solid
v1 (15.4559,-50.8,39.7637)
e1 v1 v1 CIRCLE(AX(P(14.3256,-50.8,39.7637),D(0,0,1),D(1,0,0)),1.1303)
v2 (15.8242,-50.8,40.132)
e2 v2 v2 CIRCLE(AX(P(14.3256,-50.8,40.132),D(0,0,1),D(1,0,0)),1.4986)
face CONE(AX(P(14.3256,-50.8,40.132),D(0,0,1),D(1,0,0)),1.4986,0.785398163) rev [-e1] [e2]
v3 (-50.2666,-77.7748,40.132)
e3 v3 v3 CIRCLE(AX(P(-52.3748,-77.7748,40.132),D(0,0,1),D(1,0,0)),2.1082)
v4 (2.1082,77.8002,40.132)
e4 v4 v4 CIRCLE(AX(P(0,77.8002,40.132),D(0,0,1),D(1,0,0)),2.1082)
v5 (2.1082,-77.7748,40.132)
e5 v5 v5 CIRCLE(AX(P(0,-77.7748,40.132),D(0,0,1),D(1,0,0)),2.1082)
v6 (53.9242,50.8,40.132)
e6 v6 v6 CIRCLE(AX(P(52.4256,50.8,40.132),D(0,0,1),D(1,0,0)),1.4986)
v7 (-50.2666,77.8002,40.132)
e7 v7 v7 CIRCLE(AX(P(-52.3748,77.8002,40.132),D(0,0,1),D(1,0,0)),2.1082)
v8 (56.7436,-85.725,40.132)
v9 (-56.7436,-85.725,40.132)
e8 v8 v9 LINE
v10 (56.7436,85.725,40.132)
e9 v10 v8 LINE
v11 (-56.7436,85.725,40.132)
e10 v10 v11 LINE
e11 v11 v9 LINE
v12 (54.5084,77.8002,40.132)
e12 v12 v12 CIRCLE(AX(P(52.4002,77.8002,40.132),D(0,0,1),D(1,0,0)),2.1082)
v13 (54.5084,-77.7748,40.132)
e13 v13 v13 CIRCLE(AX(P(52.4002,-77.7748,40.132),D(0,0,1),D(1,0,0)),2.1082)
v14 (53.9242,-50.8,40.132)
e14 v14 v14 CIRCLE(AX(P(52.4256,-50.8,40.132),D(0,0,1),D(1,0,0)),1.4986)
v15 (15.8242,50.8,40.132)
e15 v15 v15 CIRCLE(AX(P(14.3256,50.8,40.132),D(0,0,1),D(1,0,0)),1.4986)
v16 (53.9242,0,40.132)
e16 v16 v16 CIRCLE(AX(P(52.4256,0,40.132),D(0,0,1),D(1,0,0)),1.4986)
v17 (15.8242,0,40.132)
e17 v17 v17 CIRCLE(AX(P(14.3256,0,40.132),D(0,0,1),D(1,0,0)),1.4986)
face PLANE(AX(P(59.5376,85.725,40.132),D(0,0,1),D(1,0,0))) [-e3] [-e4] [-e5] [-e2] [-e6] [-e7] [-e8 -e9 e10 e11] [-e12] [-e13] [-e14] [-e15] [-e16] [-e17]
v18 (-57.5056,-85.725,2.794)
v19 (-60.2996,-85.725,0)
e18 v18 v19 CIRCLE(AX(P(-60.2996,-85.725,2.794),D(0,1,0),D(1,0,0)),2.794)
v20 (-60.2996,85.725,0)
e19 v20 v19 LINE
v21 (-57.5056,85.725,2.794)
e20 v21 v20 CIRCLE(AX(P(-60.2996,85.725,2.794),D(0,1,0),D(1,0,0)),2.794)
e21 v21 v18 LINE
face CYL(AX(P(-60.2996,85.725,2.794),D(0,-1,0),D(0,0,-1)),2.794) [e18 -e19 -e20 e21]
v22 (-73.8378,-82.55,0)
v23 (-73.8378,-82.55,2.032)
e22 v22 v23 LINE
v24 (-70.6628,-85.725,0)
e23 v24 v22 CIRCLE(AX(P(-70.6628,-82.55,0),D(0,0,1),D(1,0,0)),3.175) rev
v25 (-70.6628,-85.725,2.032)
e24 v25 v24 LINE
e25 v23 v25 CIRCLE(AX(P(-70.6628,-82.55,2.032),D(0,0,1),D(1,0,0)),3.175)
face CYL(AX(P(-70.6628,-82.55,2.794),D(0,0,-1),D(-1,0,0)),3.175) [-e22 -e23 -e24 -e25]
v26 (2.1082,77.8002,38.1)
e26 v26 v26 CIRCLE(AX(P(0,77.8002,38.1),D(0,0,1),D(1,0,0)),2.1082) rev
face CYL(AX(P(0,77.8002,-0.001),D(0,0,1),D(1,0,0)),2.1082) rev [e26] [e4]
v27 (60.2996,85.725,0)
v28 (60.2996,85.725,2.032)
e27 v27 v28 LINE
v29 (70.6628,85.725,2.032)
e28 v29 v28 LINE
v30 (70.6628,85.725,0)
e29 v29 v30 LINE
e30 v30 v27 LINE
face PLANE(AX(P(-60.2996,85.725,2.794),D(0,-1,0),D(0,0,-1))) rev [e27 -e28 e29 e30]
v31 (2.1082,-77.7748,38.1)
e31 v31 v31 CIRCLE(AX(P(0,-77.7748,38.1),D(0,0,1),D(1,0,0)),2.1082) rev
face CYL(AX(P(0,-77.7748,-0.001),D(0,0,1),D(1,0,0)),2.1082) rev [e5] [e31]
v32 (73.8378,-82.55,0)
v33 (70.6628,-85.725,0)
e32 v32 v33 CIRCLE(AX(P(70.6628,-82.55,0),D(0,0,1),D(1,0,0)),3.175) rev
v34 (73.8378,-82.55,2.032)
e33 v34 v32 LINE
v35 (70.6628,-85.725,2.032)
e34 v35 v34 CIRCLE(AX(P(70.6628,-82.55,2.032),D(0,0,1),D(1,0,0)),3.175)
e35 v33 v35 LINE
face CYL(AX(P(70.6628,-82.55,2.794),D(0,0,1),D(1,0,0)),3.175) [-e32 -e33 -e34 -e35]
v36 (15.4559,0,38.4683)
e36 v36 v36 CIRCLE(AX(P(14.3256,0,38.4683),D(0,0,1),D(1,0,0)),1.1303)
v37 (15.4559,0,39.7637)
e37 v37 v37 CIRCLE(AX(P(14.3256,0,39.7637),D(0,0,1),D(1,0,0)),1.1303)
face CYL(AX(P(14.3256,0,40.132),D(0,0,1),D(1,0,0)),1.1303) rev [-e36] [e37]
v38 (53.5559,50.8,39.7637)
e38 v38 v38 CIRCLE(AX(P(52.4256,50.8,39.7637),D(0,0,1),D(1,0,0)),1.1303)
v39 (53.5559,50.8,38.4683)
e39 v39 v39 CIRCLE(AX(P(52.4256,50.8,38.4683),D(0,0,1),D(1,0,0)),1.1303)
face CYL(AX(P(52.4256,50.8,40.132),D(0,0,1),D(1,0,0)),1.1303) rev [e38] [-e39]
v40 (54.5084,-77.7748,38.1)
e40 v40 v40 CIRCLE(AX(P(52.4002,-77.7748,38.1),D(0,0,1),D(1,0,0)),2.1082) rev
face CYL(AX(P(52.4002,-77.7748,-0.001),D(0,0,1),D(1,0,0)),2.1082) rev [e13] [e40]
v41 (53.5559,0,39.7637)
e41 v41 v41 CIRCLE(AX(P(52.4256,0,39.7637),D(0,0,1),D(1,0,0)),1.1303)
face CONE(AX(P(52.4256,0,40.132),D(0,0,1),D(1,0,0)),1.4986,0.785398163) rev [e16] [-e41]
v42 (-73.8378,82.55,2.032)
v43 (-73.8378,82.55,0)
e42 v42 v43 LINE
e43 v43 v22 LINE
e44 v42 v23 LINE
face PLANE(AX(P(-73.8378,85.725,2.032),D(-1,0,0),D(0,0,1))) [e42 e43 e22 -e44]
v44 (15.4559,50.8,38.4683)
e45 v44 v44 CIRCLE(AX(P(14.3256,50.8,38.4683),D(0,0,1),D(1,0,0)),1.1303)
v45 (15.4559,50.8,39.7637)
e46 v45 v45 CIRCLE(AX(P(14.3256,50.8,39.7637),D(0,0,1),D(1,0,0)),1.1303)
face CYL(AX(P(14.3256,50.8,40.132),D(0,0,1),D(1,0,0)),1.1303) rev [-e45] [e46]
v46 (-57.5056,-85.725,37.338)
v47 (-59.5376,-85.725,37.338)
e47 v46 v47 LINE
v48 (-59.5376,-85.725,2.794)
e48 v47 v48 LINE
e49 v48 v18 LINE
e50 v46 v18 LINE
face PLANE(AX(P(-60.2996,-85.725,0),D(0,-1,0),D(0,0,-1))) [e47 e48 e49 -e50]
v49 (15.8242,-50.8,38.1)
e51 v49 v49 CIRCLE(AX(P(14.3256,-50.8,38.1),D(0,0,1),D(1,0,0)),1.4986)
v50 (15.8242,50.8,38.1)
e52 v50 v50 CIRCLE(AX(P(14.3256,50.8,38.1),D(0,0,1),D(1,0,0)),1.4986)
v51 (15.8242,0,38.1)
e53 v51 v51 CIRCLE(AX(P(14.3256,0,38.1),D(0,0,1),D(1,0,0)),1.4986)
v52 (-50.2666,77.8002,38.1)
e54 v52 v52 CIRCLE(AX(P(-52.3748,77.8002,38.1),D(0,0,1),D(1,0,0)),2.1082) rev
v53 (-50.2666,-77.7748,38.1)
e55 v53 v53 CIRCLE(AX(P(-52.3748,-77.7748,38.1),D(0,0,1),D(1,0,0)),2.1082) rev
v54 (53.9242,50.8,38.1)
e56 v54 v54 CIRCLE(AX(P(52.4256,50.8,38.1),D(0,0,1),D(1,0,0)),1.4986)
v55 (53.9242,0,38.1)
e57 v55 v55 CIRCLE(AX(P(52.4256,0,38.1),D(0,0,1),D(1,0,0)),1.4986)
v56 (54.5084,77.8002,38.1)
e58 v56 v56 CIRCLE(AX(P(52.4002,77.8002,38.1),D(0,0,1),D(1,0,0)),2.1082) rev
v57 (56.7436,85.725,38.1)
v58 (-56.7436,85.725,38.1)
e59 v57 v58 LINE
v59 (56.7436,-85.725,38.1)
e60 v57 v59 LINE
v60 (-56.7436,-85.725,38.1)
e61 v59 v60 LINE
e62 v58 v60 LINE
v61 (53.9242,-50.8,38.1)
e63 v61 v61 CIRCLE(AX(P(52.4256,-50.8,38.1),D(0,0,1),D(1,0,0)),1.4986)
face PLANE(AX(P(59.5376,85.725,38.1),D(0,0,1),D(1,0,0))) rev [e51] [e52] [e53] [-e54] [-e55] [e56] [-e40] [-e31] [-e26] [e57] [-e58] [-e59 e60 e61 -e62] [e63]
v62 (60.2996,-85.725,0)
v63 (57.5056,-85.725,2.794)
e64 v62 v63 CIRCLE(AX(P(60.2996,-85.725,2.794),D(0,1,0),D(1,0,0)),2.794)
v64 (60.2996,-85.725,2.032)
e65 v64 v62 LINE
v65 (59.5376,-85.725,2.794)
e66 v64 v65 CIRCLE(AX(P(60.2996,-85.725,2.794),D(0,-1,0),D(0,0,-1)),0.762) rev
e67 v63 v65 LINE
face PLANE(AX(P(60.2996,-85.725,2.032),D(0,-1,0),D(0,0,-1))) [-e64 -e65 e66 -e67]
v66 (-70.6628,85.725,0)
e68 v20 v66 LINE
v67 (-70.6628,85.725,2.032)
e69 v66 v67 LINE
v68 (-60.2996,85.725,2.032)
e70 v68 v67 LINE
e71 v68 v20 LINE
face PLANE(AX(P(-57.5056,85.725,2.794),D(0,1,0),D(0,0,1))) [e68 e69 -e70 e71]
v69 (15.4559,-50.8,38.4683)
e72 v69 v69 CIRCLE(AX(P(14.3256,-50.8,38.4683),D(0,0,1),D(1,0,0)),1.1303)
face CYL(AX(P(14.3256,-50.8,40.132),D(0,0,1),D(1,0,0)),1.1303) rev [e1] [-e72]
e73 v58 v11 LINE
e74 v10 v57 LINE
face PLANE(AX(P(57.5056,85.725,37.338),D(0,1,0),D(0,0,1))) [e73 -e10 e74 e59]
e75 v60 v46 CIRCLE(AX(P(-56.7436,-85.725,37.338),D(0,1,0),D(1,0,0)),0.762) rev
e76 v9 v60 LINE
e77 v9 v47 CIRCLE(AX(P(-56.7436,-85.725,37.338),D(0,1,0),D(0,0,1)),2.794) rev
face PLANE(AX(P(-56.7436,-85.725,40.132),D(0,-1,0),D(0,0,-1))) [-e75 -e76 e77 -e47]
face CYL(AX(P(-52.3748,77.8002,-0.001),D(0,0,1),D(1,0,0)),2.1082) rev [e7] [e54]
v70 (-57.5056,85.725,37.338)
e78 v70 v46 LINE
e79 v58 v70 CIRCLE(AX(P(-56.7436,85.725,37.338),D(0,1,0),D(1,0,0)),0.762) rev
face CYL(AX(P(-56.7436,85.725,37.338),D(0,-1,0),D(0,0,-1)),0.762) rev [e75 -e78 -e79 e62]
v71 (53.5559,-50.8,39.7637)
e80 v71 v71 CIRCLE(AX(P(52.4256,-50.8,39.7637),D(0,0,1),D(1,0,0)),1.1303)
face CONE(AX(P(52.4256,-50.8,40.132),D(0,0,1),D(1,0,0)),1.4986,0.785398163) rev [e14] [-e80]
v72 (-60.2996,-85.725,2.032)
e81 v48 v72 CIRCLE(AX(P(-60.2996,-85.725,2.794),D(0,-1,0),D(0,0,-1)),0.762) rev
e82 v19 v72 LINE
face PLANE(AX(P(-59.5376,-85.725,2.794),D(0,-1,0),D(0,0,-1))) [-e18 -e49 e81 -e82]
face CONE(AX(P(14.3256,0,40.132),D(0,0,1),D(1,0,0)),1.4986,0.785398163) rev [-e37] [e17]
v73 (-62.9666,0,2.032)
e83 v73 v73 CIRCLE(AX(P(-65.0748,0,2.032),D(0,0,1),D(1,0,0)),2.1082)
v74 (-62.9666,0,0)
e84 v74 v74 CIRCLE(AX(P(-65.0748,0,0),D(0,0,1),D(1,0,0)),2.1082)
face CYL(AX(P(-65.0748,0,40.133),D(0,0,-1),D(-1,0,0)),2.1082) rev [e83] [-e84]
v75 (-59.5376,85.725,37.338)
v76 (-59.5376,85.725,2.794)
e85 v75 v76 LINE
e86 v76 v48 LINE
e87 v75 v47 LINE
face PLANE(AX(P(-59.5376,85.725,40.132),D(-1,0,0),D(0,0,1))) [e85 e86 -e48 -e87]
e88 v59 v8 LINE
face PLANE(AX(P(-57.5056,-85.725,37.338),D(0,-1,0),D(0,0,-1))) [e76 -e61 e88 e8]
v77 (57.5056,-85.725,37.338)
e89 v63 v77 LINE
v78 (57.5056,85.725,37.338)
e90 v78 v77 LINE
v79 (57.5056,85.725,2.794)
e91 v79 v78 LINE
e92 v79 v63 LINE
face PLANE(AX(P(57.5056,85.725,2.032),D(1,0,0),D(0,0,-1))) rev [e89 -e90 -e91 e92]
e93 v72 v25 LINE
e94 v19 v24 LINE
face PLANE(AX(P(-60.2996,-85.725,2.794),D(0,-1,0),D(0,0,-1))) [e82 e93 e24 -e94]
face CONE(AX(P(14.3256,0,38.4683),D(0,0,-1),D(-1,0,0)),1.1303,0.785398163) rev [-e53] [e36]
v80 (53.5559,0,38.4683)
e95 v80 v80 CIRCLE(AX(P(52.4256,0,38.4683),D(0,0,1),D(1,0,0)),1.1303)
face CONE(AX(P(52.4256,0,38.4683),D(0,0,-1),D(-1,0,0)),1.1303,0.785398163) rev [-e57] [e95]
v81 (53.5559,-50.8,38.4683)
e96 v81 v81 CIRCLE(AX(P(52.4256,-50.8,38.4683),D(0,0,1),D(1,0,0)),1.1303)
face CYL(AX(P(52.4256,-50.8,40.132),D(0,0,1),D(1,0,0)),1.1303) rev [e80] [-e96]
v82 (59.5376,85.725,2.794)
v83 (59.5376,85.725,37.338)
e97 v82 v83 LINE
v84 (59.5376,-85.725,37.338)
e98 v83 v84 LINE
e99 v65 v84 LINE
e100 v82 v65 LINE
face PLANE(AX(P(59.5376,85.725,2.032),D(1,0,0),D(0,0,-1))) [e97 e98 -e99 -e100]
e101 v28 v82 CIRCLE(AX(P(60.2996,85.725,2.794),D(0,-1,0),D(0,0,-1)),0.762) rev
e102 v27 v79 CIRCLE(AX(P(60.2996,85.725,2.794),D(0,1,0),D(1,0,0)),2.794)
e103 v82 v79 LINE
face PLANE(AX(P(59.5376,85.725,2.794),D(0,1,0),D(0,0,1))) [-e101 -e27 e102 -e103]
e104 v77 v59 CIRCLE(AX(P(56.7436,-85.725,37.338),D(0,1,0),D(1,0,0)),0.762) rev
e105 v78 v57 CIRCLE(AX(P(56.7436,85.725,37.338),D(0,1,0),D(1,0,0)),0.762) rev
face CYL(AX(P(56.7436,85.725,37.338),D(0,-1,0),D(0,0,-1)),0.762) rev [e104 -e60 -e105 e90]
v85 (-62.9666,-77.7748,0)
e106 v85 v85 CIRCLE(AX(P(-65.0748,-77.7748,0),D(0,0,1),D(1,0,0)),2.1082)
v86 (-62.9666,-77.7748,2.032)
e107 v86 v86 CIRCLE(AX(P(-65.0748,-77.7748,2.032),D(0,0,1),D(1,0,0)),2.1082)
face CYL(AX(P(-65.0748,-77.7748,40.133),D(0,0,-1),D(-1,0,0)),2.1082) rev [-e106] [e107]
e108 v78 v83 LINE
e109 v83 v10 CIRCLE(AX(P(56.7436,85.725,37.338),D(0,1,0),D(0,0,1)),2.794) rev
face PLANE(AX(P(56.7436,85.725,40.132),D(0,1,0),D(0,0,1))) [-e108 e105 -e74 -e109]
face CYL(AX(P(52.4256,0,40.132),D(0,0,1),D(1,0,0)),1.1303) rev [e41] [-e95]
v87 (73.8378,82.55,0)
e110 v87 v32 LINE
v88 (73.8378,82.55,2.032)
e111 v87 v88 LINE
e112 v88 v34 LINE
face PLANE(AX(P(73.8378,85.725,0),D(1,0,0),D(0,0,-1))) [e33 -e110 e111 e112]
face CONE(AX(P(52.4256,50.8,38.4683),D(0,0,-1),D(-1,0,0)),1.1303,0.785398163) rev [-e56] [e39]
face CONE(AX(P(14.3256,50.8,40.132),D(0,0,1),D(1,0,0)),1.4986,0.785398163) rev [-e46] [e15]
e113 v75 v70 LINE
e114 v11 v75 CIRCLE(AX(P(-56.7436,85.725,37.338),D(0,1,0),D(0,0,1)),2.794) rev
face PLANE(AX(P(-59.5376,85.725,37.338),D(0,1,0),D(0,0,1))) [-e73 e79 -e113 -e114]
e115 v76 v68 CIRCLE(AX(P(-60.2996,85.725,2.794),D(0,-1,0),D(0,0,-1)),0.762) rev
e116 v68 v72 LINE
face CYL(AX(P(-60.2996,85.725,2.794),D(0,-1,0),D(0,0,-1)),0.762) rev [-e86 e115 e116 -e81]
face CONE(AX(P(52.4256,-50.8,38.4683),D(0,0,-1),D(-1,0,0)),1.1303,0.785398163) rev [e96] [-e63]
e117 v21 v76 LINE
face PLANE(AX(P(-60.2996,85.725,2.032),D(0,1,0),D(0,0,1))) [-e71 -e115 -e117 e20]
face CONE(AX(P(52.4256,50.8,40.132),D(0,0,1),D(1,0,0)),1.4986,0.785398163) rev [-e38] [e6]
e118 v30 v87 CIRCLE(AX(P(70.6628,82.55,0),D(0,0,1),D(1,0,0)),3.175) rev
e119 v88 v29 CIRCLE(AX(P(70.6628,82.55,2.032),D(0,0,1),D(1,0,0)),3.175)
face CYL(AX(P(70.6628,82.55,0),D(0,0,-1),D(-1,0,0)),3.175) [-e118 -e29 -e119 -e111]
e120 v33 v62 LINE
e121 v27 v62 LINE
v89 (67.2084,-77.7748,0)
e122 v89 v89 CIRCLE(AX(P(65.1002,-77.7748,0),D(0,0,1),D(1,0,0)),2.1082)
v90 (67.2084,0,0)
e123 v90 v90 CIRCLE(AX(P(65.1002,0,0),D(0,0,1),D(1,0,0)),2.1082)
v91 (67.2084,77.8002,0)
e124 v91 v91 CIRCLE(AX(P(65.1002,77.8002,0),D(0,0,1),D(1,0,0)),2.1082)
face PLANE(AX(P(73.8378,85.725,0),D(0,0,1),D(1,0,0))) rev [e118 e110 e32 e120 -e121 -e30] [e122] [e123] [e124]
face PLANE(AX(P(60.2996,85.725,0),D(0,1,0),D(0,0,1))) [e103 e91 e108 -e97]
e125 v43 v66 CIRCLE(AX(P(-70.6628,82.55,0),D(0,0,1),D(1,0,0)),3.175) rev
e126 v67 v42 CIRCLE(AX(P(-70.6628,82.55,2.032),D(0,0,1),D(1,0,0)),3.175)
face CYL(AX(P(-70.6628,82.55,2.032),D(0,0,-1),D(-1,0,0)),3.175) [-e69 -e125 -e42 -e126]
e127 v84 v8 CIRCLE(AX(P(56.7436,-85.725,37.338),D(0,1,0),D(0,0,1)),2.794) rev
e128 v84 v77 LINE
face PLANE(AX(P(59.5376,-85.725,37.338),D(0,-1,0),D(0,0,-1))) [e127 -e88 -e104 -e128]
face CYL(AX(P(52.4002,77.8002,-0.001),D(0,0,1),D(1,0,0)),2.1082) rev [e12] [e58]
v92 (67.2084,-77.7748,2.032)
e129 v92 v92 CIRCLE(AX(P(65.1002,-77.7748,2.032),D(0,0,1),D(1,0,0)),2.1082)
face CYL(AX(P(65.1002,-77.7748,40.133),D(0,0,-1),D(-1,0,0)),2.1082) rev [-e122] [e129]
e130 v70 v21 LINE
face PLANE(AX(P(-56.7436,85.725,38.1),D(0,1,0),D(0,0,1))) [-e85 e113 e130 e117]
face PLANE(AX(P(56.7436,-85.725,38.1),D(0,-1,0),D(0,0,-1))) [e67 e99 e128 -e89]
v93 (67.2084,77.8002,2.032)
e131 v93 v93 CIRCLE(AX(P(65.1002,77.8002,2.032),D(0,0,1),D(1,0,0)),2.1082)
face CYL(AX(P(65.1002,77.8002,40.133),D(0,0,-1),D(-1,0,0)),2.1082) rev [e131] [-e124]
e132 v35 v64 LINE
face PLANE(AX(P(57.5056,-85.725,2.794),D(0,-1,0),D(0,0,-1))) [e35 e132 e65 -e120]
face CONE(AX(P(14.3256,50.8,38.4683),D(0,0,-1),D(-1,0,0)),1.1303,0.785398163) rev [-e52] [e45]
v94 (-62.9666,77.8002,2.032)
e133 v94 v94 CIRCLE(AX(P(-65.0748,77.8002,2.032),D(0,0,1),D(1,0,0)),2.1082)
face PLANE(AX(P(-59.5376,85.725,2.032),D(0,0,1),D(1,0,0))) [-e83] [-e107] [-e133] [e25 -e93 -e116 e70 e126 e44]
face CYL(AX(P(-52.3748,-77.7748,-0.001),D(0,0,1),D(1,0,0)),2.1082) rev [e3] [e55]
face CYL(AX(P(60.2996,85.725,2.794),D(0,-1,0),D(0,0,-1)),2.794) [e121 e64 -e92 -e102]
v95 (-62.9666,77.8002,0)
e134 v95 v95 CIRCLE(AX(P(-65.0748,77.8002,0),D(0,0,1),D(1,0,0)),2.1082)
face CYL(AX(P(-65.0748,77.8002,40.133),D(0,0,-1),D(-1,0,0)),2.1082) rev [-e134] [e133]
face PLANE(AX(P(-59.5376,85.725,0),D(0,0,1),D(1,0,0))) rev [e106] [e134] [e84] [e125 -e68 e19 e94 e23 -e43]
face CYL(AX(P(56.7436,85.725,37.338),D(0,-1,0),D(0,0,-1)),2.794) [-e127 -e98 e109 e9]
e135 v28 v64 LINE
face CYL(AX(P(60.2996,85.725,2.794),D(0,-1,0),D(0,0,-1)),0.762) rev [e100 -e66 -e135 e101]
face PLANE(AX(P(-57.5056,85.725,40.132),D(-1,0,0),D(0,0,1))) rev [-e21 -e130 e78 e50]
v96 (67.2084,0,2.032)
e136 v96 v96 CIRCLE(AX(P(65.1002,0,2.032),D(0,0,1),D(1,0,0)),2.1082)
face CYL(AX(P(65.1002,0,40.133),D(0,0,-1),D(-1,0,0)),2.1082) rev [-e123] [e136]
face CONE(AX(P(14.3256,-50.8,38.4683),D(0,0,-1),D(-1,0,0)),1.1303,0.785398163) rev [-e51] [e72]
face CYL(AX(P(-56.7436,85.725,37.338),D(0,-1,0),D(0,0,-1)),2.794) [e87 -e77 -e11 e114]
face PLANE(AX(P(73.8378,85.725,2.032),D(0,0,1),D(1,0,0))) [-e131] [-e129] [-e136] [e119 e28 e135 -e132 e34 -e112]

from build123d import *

# Parameters (mm, degrees)
BASE_FLANGE1_DEPTH             = 85.725
CUT_EXTRUDE1_REACH             = 122.047
SKETCH3_R                      = 2.1082
CUT_EXTRUDE2_REACH             = 122.047
SKETCH4_R                      = 2.1082
F_4_40_TAPPED_HOLE1_AT_2_COUNT = 2
F_4_40_TAPPED_HOLE1_AT_2_PITCH = 101.6
F_4_40_TAPPED_HOLE1_AT_3_COUNT = 2
F_4_40_TAPPED_HOLE1_AT_3_PITCH = 38.1
F_4_40_TAPPED_HOLE1_AT_4_COUNT = 2
F_4_40_TAPPED_HOLE1_AT_4_PITCH = 63.5
F_4_40_TAPPED_HOLE1_AT_5_COUNT = 2
F_4_40_TAPPED_HOLE1_AT_5_PITCH = 108.508847566
F_4_40_TAPPED_HOLE1_AT_6_COUNT = 2
F_4_40_TAPPED_HOLE1_AT_6_PITCH = 50.8
FILLET1_R                      = 3.175


# Sheet-metal steps are written as plain solids
with BuildPart() as part:
    # Sketch1 → Base-Flange1 (new, symmetric)
    with BuildSketch(Plane(origin=(0, 0, 0), x_dir=(1, 0, 0), z_dir=(0, 1, 0))):
        with BuildLine():
            Line((73.8378, -2.032), (60.2996, -2.032))
            ThreePointArc((60.2996, -2.032), (59.760784633, -2.255184633), (59.5376, -2.794))
            Line((59.5376, -2.794), (59.5376, -37.338))
            ThreePointArc((59.5376, -37.338), (58.719256347, -39.313656347), (56.7436, -40.132))
            Line((56.7436, -40.132), (-56.7436, -40.132))
            ThreePointArc((-56.7436, -40.132), (-58.719256347, -39.313656347), (-59.5376, -37.338))
            Line((-59.5376, -37.338), (-59.5376, -2.794))
            ThreePointArc((-59.5376, -2.794), (-59.760784633, -2.255184633), (-60.2996, -2.032))
            Line((-60.2996, -2.032), (-73.8378, -2.032))
            Line((-73.8378, -2.032), (-73.8378, 0))
            Line((-73.8378, 0), (-60.2996, 0))
            ThreePointArc((-60.2996, 0), (-58.323943653, -0.818343653), (-57.5056, -2.794))
            Line((-57.5056, -2.794), (-57.5056, -37.338))
            ThreePointArc((-57.5056, -37.338), (-57.282415367, -37.876815367), (-56.7436, -38.1))
            Line((-56.7436, -38.1), (56.7436, -38.1))
            ThreePointArc((56.7436, -38.1), (57.282415367, -37.876815367), (57.5056, -37.338))
            Line((57.5056, -37.338), (57.5056, -2.794))
            ThreePointArc((57.5056, -2.794), (58.323943653, -0.818343653), (60.2996, 0))
            Line((60.2996, 0), (73.8378, 0))
            Line((73.8378, 0), (73.8378, -2.032))
        make_face()
    extrude(amount=BASE_FLANGE1_DEPTH, both=True)

    # Sketch3 → Cut-Extrude1 (cut, up to next)
    with BuildSketch(Plane.XY.offset(40.132), mode=Mode.PRIVATE) as cut_extrude1_sk1:
        with Locations((52.4002, 77.8002)):
            Circle(SKETCH3_R)
    cut_extrude1_tool1 = extrude(cut_extrude1_sk1.sketch, amount=-CUT_EXTRUDE1_REACH, mode=Mode.PRIVATE) & part.part
    # Sketch3 → Cut-Extrude1 (cut, up to next)
    with BuildSketch(Plane.XY.offset(40.132), mode=Mode.PRIVATE) as cut_extrude1_sk2:
        with Locations((52.4002, -77.7748)):
            Circle(SKETCH3_R)
    cut_extrude1_tool2 = extrude(cut_extrude1_sk2.sketch, amount=-CUT_EXTRUDE1_REACH, mode=Mode.PRIVATE) & part.part
    # Sketch3 → Cut-Extrude1 (cut, up to next)
    with BuildSketch(Plane.XY.offset(40.132), mode=Mode.PRIVATE) as cut_extrude1_sk3:
        with Locations((-52.3748, 77.8002)):
            Circle(SKETCH3_R)
    cut_extrude1_tool3 = extrude(cut_extrude1_sk3.sketch, amount=-CUT_EXTRUDE1_REACH, mode=Mode.PRIVATE) & part.part
    # Sketch3 → Cut-Extrude1 (cut, up to next)
    with BuildSketch(Plane.XY.offset(40.132), mode=Mode.PRIVATE) as cut_extrude1_sk4:
        with Locations((-52.3748, -77.7748)):
            Circle(SKETCH3_R)
    cut_extrude1_tool4 = extrude(cut_extrude1_sk4.sketch, amount=-CUT_EXTRUDE1_REACH, mode=Mode.PRIVATE) & part.part
    # Sketch3 → Cut-Extrude1 (cut, up to next)
    with BuildSketch(Plane.XY.offset(40.132), mode=Mode.PRIVATE) as cut_extrude1_sk5:
        with Locations((0, 77.8002)):
            Circle(SKETCH3_R)
    cut_extrude1_tool5 = extrude(cut_extrude1_sk5.sketch, amount=-CUT_EXTRUDE1_REACH, mode=Mode.PRIVATE) & part.part
    # Sketch3 → Cut-Extrude1 (cut, up to next)
    with BuildSketch(Plane.XY.offset(40.132), mode=Mode.PRIVATE) as cut_extrude1_sk6:
        with Locations((0, -77.7748)):
            Circle(SKETCH3_R)
    cut_extrude1_tool6 = extrude(cut_extrude1_sk6.sketch, amount=-CUT_EXTRUDE1_REACH, mode=Mode.PRIVATE) & part.part
    add(cut_extrude1_tool1.solids().sort_by_distance((52.4002, 77.8002, 40.132))[0], mode=Mode.SUBTRACT)
    add(cut_extrude1_tool2.solids().sort_by_distance((52.4002, -77.7748, 40.132))[0], mode=Mode.SUBTRACT)
    add(cut_extrude1_tool3.solids().sort_by_distance((-52.3748, 77.8002, 40.132))[0], mode=Mode.SUBTRACT)
    add(cut_extrude1_tool4.solids().sort_by_distance((-52.3748, -77.7748, 40.132))[0], mode=Mode.SUBTRACT)
    add(cut_extrude1_tool5.solids().sort_by_distance((0, 77.8002, 40.132))[0], mode=Mode.SUBTRACT)
    add(cut_extrude1_tool6.solids().sort_by_distance((0, -77.7748, 40.132))[0], mode=Mode.SUBTRACT)

    # Sketch4 → Cut-Extrude2 (cut, up to next)
    with BuildSketch(Plane.XY, mode=Mode.PRIVATE) as cut_extrude2_sk1:
        with Locations((65.1002, -77.7748)):
            Circle(SKETCH4_R)
    cut_extrude2_tool1 = extrude(cut_extrude2_sk1.sketch, amount=CUT_EXTRUDE2_REACH, mode=Mode.PRIVATE) & part.part
    # Sketch4 → Cut-Extrude2 (cut, up to next)
    with BuildSketch(Plane.XY, mode=Mode.PRIVATE) as cut_extrude2_sk2:
        with Locations((65.1002, 77.8002)):
            Circle(SKETCH4_R)
    cut_extrude2_tool2 = extrude(cut_extrude2_sk2.sketch, amount=CUT_EXTRUDE2_REACH, mode=Mode.PRIVATE) & part.part
    # Sketch4 → Cut-Extrude2 (cut, up to next)
    with BuildSketch(Plane.XY, mode=Mode.PRIVATE) as cut_extrude2_sk3:
        with Locations((-65.0748, 77.8002)):
            Circle(SKETCH4_R)
    cut_extrude2_tool3 = extrude(cut_extrude2_sk3.sketch, amount=CUT_EXTRUDE2_REACH, mode=Mode.PRIVATE) & part.part
    # Sketch4 → Cut-Extrude2 (cut, up to next)
    with BuildSketch(Plane.XY, mode=Mode.PRIVATE) as cut_extrude2_sk4:
        with Locations((-65.0748, -77.7748)):
            Circle(SKETCH4_R)
    cut_extrude2_tool4 = extrude(cut_extrude2_sk4.sketch, amount=CUT_EXTRUDE2_REACH, mode=Mode.PRIVATE) & part.part
    # Sketch4 → Cut-Extrude2 (cut, up to next)
    with BuildSketch(Plane.XY, mode=Mode.PRIVATE) as cut_extrude2_sk5:
        with Locations((65.1002, 0)):
            Circle(SKETCH4_R)
    cut_extrude2_tool5 = extrude(cut_extrude2_sk5.sketch, amount=CUT_EXTRUDE2_REACH, mode=Mode.PRIVATE) & part.part
    # Sketch4 → Cut-Extrude2 (cut, up to next)
    with BuildSketch(Plane.XY, mode=Mode.PRIVATE) as cut_extrude2_sk6:
        with Locations((-65.0748, 0)):
            Circle(SKETCH4_R)
    cut_extrude2_tool6 = extrude(cut_extrude2_sk6.sketch, amount=CUT_EXTRUDE2_REACH, mode=Mode.PRIVATE) & part.part
    add(cut_extrude2_tool1.solids().sort_by_distance((65.1002, -77.7748, 0))[0], mode=Mode.SUBTRACT)
    add(cut_extrude2_tool2.solids().sort_by_distance((65.1002, 77.8002, 0))[0], mode=Mode.SUBTRACT)
    add(cut_extrude2_tool3.solids().sort_by_distance((-65.0748, 77.8002, 0))[0], mode=Mode.SUBTRACT)
    add(cut_extrude2_tool4.solids().sort_by_distance((-65.0748, -77.7748, 0))[0], mode=Mode.SUBTRACT)
    add(cut_extrude2_tool5.solids().sort_by_distance((65.1002, 0, 0))[0], mode=Mode.SUBTRACT)
    add(cut_extrude2_tool6.solids().sort_by_distance((-65.0748, 0, 0))[0], mode=Mode.SUBTRACT)

    # Sketch5 → #4-40 Tapped Hole1 (revolve, cut)
    with BuildSketch(Plane(origin=(52.4256, -50.8, 40.132), x_dir=(0, -1, 0), z_dir=(1, 0, 0))):
        Polygon((0, 0), (0, 2.032), (1.4986, 2.032), (1.1303, 1.6637), (1.1303, 0.3683), (1.4986, 0), align=None)
    f_4_40_tapped_hole1 = revolve(axis=Axis((52.4256, -50.8, 46.482), (0, 0, -1)), mode=Mode.SUBTRACT)

    # #4-40 Tapped Hole1 at 2: #4-40 Tapped Hole1 ×2
    with Locations(*[(0, i * F_4_40_TAPPED_HOLE1_AT_2_PITCH, 0) for i in range(1, F_4_40_TAPPED_HOLE1_AT_2_COUNT)]):
        add(f_4_40_tapped_hole1, mode=Mode.SUBTRACT)

    # #4-40 Tapped Hole1 at 3: #4-40 Tapped Hole1 ×2
    with Locations(*[(-i * F_4_40_TAPPED_HOLE1_AT_3_PITCH, 0, 0) for i in range(1, F_4_40_TAPPED_HOLE1_AT_3_COUNT)]):
        add(f_4_40_tapped_hole1, mode=Mode.SUBTRACT)

    # #4-40 Tapped Hole1 at 4: #4-40 Tapped Hole1 ×2
    with Locations(*[Vector(-0.6000000000000001, 0.8, 0) * (i * F_4_40_TAPPED_HOLE1_AT_4_PITCH) for i in range(1, F_4_40_TAPPED_HOLE1_AT_4_COUNT)]):
        add(f_4_40_tapped_hole1, mode=Mode.SUBTRACT)

    # #4-40 Tapped Hole1 at 5: #4-40 Tapped Hole1 ×2
    with Locations(*[Vector(-0.35112344158839176, 0.9363291775690445, 0) * (i * F_4_40_TAPPED_HOLE1_AT_5_PITCH) for i in range(1, F_4_40_TAPPED_HOLE1_AT_5_COUNT)]):
        add(f_4_40_tapped_hole1, mode=Mode.SUBTRACT)

    # #4-40 Tapped Hole1 at 6: #4-40 Tapped Hole1 ×2
    with Locations(*[(0, i * F_4_40_TAPPED_HOLE1_AT_6_PITCH, 0) for i in range(1, F_4_40_TAPPED_HOLE1_AT_6_COUNT)]):
        add(f_4_40_tapped_hole1, mode=Mode.SUBTRACT)

    # Fillet1
    fillet1_edges = [part.edges().sort_by_distance(p)[0] for p in [
        (73.8378, -85.725, 1.016),
        (-73.8378, -85.725, 1.016),
        (73.8378, 85.725, 1.016),
        (-73.8378, 85.725, 1.016),
    ]]
    fillet(fillet1_edges, radius=FILLET1_R)


solid = part.part
